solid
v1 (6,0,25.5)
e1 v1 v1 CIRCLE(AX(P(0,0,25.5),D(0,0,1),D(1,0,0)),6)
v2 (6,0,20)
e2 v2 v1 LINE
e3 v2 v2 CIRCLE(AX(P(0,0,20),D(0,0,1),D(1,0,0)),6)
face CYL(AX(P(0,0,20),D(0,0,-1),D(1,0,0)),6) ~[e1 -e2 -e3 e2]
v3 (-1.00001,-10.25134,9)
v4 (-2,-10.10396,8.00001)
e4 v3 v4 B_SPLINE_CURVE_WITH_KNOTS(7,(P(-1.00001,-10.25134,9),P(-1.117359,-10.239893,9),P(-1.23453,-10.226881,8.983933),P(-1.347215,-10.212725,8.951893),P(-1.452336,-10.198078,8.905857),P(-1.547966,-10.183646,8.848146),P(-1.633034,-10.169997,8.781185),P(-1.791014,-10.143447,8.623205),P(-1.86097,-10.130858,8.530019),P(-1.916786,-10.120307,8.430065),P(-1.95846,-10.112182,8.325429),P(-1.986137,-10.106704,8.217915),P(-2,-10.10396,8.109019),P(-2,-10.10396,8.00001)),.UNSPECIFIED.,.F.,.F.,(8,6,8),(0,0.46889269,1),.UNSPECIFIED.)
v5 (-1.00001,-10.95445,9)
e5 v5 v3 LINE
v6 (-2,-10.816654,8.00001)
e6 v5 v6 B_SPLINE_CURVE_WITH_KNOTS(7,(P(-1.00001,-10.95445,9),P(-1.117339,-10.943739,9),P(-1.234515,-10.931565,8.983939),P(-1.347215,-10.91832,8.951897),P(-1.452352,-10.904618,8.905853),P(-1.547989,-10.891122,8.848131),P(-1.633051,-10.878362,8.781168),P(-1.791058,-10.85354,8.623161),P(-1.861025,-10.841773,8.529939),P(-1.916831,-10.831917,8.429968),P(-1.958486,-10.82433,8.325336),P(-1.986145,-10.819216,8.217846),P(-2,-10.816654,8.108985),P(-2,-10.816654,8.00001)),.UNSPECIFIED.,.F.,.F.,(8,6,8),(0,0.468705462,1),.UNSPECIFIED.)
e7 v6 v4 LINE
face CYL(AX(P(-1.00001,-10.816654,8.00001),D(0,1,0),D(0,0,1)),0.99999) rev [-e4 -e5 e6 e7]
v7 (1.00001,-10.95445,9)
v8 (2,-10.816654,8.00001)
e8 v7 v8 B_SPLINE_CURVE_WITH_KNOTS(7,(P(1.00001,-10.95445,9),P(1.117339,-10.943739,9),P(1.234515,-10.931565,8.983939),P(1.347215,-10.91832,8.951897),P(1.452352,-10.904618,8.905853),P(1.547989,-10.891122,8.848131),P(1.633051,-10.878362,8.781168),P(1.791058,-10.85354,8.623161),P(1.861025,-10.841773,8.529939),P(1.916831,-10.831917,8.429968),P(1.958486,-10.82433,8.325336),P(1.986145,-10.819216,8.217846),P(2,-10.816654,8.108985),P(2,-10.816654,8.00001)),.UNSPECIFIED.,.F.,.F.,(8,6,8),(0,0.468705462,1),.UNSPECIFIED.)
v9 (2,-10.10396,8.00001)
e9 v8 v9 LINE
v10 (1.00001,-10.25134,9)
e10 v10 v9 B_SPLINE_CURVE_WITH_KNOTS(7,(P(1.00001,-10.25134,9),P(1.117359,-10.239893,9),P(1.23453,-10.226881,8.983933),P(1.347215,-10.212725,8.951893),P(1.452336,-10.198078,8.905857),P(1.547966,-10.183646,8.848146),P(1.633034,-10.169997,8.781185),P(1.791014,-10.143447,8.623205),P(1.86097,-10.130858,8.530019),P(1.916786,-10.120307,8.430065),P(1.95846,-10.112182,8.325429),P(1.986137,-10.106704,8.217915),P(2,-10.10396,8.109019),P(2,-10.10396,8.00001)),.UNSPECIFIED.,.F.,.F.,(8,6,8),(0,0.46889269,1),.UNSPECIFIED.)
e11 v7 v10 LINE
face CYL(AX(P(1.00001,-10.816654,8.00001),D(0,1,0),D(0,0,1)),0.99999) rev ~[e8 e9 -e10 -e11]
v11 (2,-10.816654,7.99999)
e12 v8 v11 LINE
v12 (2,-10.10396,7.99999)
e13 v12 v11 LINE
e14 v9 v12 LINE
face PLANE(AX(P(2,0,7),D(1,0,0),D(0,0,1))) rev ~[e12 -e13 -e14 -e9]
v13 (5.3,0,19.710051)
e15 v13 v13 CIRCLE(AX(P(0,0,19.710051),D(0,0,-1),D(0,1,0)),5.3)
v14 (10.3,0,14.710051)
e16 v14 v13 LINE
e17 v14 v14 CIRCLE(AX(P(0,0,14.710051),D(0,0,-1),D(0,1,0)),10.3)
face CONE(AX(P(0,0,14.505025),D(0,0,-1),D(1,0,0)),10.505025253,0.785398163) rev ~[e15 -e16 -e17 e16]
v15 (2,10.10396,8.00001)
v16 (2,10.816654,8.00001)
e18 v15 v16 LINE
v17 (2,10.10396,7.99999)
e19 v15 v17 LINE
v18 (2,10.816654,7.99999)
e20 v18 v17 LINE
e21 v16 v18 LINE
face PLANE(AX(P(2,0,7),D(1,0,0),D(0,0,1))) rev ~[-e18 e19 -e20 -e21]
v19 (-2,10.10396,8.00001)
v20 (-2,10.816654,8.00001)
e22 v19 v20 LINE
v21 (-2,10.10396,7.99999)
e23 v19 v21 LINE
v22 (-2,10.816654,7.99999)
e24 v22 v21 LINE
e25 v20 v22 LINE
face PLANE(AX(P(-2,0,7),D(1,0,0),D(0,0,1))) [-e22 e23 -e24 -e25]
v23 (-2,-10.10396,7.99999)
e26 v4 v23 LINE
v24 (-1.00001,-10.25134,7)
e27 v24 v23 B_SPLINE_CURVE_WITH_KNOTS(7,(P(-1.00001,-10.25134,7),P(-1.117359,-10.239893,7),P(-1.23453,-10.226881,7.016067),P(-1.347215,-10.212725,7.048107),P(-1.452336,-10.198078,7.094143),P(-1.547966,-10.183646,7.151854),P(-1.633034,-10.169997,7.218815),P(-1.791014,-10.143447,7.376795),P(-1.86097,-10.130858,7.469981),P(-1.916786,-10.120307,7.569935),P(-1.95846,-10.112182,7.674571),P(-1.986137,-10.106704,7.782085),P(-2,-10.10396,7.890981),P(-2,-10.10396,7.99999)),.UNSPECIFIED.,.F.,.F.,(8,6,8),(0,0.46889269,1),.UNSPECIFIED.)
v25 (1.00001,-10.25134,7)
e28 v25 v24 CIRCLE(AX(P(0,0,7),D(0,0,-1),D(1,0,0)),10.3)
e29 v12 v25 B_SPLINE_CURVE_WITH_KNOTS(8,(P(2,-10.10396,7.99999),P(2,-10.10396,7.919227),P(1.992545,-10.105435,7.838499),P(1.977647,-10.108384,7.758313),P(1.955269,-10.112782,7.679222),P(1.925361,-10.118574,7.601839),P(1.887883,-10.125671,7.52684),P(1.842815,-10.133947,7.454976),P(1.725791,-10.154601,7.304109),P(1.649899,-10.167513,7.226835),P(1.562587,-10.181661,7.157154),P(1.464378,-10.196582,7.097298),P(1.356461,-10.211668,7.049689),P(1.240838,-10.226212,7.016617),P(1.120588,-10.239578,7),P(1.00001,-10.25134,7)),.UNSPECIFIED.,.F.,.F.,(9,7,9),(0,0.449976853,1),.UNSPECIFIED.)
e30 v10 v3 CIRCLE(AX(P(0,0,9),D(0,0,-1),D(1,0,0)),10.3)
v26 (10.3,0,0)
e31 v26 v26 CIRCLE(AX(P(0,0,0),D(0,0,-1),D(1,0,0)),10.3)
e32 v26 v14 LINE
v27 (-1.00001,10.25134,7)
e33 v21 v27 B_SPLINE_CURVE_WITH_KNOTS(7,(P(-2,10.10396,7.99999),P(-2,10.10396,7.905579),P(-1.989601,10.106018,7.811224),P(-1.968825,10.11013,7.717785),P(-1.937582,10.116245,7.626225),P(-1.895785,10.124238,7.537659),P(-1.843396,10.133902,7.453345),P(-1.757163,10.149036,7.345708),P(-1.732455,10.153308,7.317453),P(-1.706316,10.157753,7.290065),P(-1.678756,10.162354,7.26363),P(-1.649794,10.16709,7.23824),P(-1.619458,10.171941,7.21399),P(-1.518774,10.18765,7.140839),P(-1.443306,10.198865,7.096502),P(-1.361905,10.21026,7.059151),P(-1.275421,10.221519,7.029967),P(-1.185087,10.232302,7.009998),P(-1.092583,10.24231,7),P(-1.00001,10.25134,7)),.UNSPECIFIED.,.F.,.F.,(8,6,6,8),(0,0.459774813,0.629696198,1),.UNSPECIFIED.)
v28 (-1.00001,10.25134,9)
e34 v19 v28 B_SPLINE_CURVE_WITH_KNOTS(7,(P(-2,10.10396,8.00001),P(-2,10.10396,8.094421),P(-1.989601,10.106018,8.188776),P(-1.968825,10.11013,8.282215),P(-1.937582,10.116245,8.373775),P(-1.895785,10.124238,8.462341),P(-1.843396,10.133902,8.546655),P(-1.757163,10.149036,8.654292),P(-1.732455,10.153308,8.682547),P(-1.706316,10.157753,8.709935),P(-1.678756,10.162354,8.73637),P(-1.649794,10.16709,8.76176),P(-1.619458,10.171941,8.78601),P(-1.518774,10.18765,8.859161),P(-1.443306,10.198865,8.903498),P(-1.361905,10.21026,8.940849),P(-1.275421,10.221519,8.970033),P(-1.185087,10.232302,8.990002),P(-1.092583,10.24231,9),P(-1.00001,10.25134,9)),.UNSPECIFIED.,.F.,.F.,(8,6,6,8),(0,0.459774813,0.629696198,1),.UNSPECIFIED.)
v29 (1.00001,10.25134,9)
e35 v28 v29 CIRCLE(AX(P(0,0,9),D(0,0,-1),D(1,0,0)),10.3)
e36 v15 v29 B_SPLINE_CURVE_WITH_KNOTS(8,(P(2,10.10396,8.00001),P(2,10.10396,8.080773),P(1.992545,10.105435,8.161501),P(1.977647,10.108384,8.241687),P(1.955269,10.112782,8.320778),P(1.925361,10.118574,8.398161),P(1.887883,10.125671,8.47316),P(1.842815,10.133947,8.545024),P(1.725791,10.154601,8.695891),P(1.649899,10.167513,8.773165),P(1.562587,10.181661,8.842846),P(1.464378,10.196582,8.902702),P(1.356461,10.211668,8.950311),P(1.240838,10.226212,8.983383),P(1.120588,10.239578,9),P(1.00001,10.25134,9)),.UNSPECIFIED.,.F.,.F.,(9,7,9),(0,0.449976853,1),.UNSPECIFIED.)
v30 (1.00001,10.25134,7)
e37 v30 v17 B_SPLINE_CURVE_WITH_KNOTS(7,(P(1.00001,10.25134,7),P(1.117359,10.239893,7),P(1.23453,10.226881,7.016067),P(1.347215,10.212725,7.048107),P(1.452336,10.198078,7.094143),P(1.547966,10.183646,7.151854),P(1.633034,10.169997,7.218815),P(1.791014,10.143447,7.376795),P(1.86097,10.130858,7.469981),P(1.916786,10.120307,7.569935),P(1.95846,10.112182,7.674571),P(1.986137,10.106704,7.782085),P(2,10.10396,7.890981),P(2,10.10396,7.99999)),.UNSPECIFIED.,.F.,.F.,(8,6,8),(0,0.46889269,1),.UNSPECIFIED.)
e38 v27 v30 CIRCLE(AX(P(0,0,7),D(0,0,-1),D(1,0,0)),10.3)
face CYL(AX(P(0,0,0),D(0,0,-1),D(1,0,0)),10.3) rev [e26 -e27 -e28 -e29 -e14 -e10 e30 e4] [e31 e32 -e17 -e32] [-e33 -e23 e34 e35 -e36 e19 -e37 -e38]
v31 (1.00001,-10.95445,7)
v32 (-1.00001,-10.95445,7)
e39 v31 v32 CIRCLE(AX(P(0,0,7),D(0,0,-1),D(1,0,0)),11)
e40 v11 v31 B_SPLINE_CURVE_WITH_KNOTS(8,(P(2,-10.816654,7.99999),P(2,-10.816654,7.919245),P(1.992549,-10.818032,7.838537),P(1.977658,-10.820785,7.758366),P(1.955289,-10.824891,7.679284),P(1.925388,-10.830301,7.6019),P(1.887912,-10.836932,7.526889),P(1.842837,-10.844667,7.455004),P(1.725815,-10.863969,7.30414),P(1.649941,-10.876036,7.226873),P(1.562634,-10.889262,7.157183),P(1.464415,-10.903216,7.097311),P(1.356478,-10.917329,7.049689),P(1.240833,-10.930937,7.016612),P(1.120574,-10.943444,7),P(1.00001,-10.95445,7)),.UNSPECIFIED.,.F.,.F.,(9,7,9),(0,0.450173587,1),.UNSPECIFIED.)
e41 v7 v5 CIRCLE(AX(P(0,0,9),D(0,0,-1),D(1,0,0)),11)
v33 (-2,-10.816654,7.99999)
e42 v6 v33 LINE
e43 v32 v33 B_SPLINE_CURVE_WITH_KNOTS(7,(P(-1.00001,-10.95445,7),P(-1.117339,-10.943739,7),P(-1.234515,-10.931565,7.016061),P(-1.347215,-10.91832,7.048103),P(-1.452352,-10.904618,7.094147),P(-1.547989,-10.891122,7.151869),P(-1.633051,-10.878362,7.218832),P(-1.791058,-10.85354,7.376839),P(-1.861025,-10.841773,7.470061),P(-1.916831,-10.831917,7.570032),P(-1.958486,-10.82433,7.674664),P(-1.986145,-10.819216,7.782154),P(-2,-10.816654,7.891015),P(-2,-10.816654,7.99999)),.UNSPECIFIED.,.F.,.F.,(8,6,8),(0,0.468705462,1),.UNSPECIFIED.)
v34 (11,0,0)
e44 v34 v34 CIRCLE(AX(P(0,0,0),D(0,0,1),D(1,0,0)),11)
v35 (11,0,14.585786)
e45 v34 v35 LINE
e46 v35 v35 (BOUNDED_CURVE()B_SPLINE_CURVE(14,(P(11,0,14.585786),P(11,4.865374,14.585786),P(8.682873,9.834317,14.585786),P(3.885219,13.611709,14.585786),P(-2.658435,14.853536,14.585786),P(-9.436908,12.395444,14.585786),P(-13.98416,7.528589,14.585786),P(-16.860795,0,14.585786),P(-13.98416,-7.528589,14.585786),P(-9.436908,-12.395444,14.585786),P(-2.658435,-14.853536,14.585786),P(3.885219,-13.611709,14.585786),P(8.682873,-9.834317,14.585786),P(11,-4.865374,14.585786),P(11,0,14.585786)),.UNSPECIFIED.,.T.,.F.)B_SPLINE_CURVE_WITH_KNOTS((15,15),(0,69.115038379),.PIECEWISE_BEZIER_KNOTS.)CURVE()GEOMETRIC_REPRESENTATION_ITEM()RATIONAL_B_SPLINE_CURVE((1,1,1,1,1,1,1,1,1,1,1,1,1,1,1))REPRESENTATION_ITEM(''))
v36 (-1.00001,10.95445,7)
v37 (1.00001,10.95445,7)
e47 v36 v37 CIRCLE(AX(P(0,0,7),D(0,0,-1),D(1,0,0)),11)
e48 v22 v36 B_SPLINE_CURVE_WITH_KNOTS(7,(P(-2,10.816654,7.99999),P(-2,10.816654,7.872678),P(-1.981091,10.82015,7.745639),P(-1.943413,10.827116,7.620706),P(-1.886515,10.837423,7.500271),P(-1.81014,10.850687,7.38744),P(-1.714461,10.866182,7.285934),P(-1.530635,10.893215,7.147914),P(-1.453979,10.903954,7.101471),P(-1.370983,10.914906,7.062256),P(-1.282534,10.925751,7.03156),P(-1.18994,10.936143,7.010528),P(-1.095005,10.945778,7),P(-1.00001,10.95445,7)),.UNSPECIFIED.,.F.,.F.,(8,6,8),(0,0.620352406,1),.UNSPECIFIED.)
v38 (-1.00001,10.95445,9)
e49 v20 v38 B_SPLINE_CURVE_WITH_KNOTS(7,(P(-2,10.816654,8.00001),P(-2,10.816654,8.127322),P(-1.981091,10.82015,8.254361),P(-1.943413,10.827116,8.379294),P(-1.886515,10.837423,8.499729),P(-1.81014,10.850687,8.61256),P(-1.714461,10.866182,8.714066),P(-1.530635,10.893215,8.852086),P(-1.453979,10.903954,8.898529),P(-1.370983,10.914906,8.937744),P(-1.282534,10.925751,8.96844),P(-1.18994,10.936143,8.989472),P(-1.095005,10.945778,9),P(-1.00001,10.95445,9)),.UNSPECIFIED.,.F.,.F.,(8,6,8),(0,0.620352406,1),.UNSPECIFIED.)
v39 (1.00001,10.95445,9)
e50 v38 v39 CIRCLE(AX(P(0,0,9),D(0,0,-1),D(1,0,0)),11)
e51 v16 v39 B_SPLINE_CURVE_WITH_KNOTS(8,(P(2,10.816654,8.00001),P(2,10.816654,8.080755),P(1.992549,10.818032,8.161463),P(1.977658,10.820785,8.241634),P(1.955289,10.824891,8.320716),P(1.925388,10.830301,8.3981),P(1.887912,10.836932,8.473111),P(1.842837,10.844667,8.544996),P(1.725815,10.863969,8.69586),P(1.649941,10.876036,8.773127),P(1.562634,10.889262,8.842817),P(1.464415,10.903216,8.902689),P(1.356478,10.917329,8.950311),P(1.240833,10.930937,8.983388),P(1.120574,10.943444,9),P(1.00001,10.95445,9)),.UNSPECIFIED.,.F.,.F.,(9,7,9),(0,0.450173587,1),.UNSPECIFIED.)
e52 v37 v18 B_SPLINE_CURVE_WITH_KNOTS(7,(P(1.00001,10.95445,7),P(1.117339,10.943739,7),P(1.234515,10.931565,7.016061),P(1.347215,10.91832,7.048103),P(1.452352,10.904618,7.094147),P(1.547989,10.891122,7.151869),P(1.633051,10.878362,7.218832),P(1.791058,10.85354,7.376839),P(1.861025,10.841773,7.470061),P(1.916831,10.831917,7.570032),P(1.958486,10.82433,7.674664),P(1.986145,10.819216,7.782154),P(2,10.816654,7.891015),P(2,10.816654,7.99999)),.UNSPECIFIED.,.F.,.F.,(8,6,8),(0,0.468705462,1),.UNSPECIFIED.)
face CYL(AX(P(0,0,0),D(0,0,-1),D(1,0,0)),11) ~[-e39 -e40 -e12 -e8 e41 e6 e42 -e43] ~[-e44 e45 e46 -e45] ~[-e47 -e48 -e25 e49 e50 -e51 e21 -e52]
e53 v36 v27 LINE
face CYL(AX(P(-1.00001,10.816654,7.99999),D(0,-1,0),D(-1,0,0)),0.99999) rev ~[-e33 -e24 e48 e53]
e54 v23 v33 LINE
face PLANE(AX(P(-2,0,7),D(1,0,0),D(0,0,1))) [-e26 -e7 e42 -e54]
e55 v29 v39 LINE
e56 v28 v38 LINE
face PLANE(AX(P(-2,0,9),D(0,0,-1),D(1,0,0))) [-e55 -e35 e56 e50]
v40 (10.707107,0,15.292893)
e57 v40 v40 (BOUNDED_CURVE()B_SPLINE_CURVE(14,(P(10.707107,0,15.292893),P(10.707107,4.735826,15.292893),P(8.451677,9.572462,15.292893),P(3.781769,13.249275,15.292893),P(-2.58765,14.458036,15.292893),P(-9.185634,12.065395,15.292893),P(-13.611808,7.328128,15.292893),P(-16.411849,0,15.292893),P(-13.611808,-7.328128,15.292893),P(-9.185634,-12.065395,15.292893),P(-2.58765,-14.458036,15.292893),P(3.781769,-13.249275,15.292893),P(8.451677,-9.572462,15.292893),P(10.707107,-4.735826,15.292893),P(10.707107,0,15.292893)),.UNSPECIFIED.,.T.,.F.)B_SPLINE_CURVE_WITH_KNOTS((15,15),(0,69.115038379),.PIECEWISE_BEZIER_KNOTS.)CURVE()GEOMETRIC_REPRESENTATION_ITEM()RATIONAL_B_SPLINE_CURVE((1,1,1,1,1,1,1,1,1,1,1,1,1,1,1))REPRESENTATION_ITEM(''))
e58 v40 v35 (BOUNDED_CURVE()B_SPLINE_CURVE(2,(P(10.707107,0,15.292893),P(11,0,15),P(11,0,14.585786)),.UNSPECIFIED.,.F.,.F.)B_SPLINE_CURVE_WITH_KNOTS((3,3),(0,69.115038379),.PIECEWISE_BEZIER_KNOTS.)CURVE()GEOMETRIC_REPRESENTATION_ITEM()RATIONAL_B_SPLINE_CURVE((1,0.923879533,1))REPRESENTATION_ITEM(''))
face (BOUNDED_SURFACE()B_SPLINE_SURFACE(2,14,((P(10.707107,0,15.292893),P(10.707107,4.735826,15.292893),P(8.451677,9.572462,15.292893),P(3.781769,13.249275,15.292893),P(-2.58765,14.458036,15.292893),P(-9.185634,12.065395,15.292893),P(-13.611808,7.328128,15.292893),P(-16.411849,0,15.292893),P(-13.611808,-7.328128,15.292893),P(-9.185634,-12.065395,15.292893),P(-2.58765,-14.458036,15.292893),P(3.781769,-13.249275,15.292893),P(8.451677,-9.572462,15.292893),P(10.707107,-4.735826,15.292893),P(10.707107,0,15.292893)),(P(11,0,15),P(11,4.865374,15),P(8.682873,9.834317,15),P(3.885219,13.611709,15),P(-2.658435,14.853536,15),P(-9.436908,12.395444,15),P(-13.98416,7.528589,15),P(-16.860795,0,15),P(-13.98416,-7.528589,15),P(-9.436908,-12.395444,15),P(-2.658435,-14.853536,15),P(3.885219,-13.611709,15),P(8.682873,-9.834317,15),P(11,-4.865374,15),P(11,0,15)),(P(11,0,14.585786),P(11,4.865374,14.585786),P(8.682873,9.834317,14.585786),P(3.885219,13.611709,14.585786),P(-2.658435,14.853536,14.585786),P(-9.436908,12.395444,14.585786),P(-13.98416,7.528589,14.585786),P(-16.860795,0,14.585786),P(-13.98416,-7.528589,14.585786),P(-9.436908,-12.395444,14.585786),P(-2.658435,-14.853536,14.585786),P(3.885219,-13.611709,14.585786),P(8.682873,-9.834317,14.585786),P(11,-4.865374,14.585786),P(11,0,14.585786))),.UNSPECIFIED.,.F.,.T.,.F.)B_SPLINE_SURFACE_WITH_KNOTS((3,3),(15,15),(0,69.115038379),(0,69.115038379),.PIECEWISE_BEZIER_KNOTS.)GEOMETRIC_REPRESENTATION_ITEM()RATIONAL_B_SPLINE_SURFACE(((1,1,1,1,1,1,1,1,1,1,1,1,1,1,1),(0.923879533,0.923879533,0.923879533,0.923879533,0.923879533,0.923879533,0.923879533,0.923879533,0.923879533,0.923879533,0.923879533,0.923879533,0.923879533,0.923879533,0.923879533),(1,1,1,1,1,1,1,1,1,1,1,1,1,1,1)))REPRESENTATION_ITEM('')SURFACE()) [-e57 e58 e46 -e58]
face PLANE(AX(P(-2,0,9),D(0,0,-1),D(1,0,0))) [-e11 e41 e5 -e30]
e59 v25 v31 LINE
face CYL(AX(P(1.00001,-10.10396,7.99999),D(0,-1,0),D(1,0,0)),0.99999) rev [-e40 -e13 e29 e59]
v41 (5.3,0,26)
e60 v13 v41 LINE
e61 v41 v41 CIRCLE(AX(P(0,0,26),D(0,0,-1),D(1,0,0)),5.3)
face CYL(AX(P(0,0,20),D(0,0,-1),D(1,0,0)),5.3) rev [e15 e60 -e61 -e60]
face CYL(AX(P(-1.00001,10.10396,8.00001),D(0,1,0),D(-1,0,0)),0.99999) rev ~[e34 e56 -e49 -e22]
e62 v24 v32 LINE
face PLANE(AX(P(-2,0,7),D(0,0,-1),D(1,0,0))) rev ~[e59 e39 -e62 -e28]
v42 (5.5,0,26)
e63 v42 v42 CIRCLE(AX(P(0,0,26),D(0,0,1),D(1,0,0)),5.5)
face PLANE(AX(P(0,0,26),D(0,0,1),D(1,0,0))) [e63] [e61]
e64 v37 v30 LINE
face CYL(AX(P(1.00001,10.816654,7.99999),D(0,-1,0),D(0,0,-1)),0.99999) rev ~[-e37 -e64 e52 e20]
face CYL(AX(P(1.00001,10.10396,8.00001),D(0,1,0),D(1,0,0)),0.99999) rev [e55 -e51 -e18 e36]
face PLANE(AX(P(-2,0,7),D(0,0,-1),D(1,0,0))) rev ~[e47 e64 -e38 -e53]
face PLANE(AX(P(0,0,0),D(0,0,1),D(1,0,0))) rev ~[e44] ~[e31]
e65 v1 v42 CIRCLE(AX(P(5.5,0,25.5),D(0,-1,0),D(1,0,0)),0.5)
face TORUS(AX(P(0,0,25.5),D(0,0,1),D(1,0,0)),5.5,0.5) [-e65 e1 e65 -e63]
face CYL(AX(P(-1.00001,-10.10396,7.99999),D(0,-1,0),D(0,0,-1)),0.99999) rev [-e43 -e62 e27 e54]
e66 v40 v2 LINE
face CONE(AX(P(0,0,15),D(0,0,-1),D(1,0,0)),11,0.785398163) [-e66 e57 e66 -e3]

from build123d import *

# Parameters (mm, degrees)
F0_R     = 11
F1_DEPTH = 20
F2_SIZE  = 5
F3_DEPTH = 6
F4_T     = -0.7
F5_W     = 4
F5_H     = 2
F6_DEPTH = 12.5
F7_R     = 0.99999
F8_R     = 0.5
F9_R     = 1


# Not quite as in the source:
# - a fillet or chamfer is up to 0.001 mm smaller than in the source, because OpenCascade refuses the exact size


with BuildPart() as f1:
    # F0 (on Top) → F1 (new body)
    with BuildSketch(Plane.XY):
        Circle(F0_R)
    extrude(amount=F1_DEPTH)

    # F2
    f2_edges = [f1.edges().sort_by_distance(p)[0] for p in [
        (-11, 0, 20),
    ]]
    chamfer(f2_edges, length=F2_SIZE)

    # F3 (add): a face of the model
    f3_faces = [f1.faces().sort_by_distance(p)[0] for p in [
        (0, 0, 20),
    ]]
    extrude(f3_faces, amount=F3_DEPTH)

    # F4
    f4_openings = [f1.faces().sort_by_distance(p)[0] for p in [
        (0, 0, 26),
        (0, 0, 0),
    ]]
    offset(amount=F4_T, openings=f4_openings, kind=Kind.INTERSECTION)

    # F5 (on Front) → F6 (cut, symmetric)
    with BuildSketch(Plane.XZ):
        with Locations((0, 8)):
            Rectangle(F5_W, F5_H)
    extrude(amount=F6_DEPTH, both=True, mode=Mode.SUBTRACT)

    # F7 (radius 1 in the source; OpenCascade refuses exactly that, so slightly less here)
    f7_edges = [f1.edges().sort_by_distance(p)[0] for p in [
        (-2, 10.460307, 7),
        (-2, -10.460307, 7),
        (2, 10.460307, 9),
        (2, -10.460307, 9),
        (-2, 10.460307, 9),
        (-2, -10.460307, 9),
        (2, 10.460307, 7),
        (2, -10.460307, 7),
    ]]
    fillet(f7_edges, radius=F7_R)

    # F8
    f8_edges = [f1.edges().sort_by_distance(p)[0] for p in [
        (-6, 0, 26),
    ]]
    fillet(f8_edges, radius=F8_R)

    # F9
    f9_edges = [f1.edges().sort_by_distance(p)[0] for p in [
        (-11, 0, 15),
    ]]
    fillet(f9_edges, radius=F9_R)


solid = f1.part
